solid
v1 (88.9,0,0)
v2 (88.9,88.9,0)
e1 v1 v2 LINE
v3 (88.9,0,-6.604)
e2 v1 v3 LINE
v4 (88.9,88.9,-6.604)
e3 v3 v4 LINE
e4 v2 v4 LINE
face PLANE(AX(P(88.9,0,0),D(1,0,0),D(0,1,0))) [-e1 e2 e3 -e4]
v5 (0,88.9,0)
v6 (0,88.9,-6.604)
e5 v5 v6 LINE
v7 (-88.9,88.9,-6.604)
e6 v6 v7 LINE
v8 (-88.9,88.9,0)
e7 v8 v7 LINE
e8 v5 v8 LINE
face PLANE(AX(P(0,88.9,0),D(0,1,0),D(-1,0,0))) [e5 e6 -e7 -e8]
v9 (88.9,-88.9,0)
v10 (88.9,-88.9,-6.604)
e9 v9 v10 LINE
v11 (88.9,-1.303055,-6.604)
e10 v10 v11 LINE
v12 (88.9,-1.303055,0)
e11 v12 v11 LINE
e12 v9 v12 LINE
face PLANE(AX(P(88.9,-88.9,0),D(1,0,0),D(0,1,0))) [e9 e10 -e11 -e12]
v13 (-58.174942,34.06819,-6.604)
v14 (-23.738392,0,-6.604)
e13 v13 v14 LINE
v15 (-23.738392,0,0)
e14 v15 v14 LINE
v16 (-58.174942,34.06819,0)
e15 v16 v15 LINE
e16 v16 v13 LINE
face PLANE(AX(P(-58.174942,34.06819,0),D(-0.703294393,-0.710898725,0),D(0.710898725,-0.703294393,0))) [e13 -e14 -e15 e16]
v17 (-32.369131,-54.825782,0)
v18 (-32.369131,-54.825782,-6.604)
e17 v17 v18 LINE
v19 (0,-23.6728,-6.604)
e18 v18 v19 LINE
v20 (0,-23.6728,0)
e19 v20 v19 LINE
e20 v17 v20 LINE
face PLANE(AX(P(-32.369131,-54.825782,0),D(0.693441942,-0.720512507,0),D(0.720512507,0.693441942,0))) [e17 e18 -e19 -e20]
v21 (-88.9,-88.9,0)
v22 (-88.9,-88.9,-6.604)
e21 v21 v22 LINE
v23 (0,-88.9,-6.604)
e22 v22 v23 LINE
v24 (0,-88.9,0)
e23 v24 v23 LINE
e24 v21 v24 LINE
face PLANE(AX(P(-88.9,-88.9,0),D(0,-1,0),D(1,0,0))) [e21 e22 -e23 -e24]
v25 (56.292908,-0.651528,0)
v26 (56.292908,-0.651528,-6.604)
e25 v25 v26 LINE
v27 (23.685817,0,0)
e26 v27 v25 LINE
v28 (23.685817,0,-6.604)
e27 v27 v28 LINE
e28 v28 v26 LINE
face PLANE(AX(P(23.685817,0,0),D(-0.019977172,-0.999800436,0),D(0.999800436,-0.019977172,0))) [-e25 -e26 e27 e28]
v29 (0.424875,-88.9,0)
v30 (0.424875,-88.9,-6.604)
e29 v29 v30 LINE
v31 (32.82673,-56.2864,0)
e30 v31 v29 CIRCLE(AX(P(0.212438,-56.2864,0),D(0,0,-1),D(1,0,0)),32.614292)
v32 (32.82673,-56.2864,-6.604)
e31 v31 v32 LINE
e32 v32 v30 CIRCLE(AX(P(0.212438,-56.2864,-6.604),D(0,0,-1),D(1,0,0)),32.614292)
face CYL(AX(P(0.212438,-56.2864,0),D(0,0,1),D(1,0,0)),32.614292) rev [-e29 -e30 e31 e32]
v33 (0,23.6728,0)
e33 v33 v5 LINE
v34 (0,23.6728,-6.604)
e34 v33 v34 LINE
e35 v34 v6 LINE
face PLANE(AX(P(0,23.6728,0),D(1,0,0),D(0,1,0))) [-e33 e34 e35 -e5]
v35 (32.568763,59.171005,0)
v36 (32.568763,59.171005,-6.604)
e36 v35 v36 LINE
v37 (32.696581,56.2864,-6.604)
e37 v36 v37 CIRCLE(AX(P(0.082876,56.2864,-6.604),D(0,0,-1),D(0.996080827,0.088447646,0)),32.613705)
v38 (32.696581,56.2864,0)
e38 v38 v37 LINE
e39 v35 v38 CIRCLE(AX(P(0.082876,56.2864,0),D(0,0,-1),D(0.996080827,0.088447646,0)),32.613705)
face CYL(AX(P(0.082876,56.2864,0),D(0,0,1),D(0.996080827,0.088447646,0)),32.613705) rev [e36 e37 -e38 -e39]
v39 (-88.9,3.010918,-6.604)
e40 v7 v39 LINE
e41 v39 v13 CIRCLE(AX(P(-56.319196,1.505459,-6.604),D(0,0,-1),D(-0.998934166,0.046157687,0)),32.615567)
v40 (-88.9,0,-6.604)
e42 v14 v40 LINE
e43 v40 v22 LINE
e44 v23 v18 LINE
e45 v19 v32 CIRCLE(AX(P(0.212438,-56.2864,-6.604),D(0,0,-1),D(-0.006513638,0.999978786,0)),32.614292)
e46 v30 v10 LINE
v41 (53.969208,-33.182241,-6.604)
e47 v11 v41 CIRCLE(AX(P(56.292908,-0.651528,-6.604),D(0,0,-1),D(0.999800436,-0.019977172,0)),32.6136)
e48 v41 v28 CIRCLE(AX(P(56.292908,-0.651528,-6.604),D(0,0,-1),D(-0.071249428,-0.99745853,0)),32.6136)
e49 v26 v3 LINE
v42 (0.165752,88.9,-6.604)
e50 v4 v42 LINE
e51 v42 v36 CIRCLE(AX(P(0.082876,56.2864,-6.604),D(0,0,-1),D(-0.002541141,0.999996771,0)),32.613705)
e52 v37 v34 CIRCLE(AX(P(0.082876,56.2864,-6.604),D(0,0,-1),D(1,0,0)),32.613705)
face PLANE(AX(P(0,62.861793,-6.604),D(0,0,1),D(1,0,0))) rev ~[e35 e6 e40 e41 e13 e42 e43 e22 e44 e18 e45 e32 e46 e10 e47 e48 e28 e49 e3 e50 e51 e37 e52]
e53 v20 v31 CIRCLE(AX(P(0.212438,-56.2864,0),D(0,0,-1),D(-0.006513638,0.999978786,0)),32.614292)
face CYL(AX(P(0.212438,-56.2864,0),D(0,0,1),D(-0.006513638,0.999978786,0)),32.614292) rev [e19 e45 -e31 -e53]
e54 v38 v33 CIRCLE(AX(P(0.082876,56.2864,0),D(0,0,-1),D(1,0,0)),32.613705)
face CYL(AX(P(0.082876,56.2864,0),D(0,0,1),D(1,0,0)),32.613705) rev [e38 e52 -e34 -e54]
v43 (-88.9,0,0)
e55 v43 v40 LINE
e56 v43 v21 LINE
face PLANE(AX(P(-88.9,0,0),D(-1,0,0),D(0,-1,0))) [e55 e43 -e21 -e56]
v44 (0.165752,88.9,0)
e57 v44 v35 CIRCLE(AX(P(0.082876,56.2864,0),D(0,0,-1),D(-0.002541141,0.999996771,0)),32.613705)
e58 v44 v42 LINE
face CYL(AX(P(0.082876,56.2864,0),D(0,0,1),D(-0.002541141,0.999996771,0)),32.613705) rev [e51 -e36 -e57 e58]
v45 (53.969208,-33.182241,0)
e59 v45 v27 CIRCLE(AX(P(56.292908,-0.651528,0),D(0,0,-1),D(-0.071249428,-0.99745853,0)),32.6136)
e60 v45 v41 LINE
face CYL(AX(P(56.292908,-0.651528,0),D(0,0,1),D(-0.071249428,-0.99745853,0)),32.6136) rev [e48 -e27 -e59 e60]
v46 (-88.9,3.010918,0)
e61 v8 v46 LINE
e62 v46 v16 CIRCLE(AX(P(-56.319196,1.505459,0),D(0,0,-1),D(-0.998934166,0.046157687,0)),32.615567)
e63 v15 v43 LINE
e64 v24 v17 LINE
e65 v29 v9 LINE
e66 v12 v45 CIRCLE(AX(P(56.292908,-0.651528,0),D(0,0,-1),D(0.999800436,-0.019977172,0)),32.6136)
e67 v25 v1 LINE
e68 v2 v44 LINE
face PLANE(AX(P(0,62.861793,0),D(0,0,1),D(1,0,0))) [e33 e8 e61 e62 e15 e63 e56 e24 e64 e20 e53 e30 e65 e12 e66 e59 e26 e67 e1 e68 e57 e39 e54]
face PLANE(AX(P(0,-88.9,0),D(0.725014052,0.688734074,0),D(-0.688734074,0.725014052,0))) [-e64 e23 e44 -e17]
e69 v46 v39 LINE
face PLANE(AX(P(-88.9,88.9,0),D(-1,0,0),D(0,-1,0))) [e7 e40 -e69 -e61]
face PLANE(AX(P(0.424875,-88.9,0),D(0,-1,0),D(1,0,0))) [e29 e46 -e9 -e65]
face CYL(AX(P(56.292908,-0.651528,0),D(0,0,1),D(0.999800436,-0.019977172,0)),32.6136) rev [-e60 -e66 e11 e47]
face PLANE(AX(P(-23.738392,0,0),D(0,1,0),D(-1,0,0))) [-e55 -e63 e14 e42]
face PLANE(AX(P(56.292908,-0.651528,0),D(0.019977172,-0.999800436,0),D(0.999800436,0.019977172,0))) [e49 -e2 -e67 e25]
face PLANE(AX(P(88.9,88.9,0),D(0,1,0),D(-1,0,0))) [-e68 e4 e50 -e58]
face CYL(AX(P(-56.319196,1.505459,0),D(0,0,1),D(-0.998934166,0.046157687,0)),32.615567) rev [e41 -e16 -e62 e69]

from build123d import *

# Parameters (mm, degrees)
F1_DEPTH = 6.604


with BuildPart() as f1:
    # F0 (on Top) → F1 (new body)
    with BuildSketch(Plane.XY):
        Polygon((-88.9, 88.9), (0, 0), (88.9, 88.9), (0, 88.9), align=None)
        with BuildLine():
            ThreePointArc((0, 23.6728), (-32.5308292905, 56.2864), (0, 88.9))
            ThreePointArc((0, 88.9), (22.0701917215, 80.3739843781), (32.5687625572, 59.1710054502))
            ThreePointArc((32.5687625572, 59.1710054502), (32.6646109516, 57.7301179639), (32.6965813095, 56.2864))
            ThreePointArc((32.6965813095, 56.2864), (23.1149284543, 33.1957453196), (0, 23.6728))
        make_face(mode=Mode.SUBTRACT)
        with BuildLine():
            Line((88.9, 88.9), (0, 0))
            Line((0, 0), (88.9, -88.9))
            Line((88.9, -88.9), (88.9, -1.303055018))
            ThreePointArc((88.9, -1.303055018), (78.2779390849, -24.7410549975), (53.9692081511, -33.1822410226))
            ThreePointArc((53.9692081511, -33.1822410226), (32.2033809996, -22.6365581058), (23.6858169762, 0))
            ThreePointArc((23.6858169762, 0), (56.2929084881, 31.962072491), (88.9, 0))
            Line((88.9, 0), (88.9, 88.9))
        make_face()
        with BuildLine():
            Line((-88.9, -88.9), (0, -88.9))
            ThreePointArc((0, -88.9), (-23.4333822085, -78.7489741197), (-32.3691311793, -54.8257820567))
            ThreePointArc((-32.3691311793, -54.8257820567), (-22.4036802199, -32.787394799), (0, -23.6728))
            ThreePointArc((0, -23.6728), (23.1989938683, -33.1496268937), (32.826729568, -56.2864))
            ThreePointArc((32.826729568, -56.2864), (23.3492107959, -79.2729561788), (0.4248753792, -88.9))
            Line((0.4248753792, -88.9), (88.9, -88.9))
            Line((88.9, -88.9), (0, 0))
            Line((0, 0), (-88.9, -88.9))
        make_face()
        with BuildLine():
            Line((-88.9, 0), (-88.9, -88.9))
            Line((-88.9, -88.9), (0, 0))
            Line((0, 0), (-88.9, 88.9))
            Line((-88.9, 88.9), (-88.9, 3.0109182433))
            ThreePointArc((-88.9, 3.0109182433), (-79.5055607914, 24.4438044642), (-58.1749416888, 34.0681895614))
            ThreePointArc((-58.1749416888, 34.0681895614), (-33.9222205657, 25.2151766333), (-23.7036289165, 1.5054591217))
            ThreePointArc((-23.7036289165, 1.5054591217), (-23.7123207699, 0.7525289094), (-23.7383916974, 0))
            ThreePointArc((-23.7383916974, 0), (-56.3191958487, -31.1101078106), (-88.9, 0))
        make_face()
        with BuildLine():
            Line((0, 23.6728), (0, 88.9))
            ThreePointArc((0, 88.9), (-32.5308292905, 56.2864), (0, 23.6728))
        make_face()
        with BuildLine():
            Line((56.2929084881, -0.651527509), (88.9, 0))
            ThreePointArc((88.9, 0), (56.2929084881, 31.962072491), (23.6858169762, 0))
            Line((23.6858169762, 0), (56.2929084881, -0.651527509))
        make_face()
        with BuildLine():
            Line((-23.7383916974, 0), (-88.9, 0))
            ThreePointArc((-88.9, 0), (-56.3191958487, -31.1101078106), (-23.7383916974, 0))
        make_face()
        with BuildLine():
            Line((-58.1749416888, 34.0681895614), (-23.7383916974, 0))
            ThreePointArc((-23.7383916974, 0), (-23.7123207699, 0.7525289094), (-23.7036289165, 1.5054591217))
            ThreePointArc((-23.7036289165, 1.5054591217), (-33.9222205657, 25.2151766333), (-58.1749416888, 34.0681895614))
        make_face()
        with BuildLine():
            ThreePointArc((-32.3691311793, -54.8257820567), (-23.4333822085, -78.7489741197), (0, -88.9))
            Line((0, -88.9), (-32.3691311793, -54.8257820567))
        make_face()
        with BuildLine():
            ThreePointArc((0, -23.6728), (-22.4036802199, -32.787394799), (-32.3691311793, -54.8257820567))
            Line((-32.3691311793, -54.8257820567), (0, -23.6728))
        make_face()
    extrude(amount=-F1_DEPTH)


solid = f1.part
